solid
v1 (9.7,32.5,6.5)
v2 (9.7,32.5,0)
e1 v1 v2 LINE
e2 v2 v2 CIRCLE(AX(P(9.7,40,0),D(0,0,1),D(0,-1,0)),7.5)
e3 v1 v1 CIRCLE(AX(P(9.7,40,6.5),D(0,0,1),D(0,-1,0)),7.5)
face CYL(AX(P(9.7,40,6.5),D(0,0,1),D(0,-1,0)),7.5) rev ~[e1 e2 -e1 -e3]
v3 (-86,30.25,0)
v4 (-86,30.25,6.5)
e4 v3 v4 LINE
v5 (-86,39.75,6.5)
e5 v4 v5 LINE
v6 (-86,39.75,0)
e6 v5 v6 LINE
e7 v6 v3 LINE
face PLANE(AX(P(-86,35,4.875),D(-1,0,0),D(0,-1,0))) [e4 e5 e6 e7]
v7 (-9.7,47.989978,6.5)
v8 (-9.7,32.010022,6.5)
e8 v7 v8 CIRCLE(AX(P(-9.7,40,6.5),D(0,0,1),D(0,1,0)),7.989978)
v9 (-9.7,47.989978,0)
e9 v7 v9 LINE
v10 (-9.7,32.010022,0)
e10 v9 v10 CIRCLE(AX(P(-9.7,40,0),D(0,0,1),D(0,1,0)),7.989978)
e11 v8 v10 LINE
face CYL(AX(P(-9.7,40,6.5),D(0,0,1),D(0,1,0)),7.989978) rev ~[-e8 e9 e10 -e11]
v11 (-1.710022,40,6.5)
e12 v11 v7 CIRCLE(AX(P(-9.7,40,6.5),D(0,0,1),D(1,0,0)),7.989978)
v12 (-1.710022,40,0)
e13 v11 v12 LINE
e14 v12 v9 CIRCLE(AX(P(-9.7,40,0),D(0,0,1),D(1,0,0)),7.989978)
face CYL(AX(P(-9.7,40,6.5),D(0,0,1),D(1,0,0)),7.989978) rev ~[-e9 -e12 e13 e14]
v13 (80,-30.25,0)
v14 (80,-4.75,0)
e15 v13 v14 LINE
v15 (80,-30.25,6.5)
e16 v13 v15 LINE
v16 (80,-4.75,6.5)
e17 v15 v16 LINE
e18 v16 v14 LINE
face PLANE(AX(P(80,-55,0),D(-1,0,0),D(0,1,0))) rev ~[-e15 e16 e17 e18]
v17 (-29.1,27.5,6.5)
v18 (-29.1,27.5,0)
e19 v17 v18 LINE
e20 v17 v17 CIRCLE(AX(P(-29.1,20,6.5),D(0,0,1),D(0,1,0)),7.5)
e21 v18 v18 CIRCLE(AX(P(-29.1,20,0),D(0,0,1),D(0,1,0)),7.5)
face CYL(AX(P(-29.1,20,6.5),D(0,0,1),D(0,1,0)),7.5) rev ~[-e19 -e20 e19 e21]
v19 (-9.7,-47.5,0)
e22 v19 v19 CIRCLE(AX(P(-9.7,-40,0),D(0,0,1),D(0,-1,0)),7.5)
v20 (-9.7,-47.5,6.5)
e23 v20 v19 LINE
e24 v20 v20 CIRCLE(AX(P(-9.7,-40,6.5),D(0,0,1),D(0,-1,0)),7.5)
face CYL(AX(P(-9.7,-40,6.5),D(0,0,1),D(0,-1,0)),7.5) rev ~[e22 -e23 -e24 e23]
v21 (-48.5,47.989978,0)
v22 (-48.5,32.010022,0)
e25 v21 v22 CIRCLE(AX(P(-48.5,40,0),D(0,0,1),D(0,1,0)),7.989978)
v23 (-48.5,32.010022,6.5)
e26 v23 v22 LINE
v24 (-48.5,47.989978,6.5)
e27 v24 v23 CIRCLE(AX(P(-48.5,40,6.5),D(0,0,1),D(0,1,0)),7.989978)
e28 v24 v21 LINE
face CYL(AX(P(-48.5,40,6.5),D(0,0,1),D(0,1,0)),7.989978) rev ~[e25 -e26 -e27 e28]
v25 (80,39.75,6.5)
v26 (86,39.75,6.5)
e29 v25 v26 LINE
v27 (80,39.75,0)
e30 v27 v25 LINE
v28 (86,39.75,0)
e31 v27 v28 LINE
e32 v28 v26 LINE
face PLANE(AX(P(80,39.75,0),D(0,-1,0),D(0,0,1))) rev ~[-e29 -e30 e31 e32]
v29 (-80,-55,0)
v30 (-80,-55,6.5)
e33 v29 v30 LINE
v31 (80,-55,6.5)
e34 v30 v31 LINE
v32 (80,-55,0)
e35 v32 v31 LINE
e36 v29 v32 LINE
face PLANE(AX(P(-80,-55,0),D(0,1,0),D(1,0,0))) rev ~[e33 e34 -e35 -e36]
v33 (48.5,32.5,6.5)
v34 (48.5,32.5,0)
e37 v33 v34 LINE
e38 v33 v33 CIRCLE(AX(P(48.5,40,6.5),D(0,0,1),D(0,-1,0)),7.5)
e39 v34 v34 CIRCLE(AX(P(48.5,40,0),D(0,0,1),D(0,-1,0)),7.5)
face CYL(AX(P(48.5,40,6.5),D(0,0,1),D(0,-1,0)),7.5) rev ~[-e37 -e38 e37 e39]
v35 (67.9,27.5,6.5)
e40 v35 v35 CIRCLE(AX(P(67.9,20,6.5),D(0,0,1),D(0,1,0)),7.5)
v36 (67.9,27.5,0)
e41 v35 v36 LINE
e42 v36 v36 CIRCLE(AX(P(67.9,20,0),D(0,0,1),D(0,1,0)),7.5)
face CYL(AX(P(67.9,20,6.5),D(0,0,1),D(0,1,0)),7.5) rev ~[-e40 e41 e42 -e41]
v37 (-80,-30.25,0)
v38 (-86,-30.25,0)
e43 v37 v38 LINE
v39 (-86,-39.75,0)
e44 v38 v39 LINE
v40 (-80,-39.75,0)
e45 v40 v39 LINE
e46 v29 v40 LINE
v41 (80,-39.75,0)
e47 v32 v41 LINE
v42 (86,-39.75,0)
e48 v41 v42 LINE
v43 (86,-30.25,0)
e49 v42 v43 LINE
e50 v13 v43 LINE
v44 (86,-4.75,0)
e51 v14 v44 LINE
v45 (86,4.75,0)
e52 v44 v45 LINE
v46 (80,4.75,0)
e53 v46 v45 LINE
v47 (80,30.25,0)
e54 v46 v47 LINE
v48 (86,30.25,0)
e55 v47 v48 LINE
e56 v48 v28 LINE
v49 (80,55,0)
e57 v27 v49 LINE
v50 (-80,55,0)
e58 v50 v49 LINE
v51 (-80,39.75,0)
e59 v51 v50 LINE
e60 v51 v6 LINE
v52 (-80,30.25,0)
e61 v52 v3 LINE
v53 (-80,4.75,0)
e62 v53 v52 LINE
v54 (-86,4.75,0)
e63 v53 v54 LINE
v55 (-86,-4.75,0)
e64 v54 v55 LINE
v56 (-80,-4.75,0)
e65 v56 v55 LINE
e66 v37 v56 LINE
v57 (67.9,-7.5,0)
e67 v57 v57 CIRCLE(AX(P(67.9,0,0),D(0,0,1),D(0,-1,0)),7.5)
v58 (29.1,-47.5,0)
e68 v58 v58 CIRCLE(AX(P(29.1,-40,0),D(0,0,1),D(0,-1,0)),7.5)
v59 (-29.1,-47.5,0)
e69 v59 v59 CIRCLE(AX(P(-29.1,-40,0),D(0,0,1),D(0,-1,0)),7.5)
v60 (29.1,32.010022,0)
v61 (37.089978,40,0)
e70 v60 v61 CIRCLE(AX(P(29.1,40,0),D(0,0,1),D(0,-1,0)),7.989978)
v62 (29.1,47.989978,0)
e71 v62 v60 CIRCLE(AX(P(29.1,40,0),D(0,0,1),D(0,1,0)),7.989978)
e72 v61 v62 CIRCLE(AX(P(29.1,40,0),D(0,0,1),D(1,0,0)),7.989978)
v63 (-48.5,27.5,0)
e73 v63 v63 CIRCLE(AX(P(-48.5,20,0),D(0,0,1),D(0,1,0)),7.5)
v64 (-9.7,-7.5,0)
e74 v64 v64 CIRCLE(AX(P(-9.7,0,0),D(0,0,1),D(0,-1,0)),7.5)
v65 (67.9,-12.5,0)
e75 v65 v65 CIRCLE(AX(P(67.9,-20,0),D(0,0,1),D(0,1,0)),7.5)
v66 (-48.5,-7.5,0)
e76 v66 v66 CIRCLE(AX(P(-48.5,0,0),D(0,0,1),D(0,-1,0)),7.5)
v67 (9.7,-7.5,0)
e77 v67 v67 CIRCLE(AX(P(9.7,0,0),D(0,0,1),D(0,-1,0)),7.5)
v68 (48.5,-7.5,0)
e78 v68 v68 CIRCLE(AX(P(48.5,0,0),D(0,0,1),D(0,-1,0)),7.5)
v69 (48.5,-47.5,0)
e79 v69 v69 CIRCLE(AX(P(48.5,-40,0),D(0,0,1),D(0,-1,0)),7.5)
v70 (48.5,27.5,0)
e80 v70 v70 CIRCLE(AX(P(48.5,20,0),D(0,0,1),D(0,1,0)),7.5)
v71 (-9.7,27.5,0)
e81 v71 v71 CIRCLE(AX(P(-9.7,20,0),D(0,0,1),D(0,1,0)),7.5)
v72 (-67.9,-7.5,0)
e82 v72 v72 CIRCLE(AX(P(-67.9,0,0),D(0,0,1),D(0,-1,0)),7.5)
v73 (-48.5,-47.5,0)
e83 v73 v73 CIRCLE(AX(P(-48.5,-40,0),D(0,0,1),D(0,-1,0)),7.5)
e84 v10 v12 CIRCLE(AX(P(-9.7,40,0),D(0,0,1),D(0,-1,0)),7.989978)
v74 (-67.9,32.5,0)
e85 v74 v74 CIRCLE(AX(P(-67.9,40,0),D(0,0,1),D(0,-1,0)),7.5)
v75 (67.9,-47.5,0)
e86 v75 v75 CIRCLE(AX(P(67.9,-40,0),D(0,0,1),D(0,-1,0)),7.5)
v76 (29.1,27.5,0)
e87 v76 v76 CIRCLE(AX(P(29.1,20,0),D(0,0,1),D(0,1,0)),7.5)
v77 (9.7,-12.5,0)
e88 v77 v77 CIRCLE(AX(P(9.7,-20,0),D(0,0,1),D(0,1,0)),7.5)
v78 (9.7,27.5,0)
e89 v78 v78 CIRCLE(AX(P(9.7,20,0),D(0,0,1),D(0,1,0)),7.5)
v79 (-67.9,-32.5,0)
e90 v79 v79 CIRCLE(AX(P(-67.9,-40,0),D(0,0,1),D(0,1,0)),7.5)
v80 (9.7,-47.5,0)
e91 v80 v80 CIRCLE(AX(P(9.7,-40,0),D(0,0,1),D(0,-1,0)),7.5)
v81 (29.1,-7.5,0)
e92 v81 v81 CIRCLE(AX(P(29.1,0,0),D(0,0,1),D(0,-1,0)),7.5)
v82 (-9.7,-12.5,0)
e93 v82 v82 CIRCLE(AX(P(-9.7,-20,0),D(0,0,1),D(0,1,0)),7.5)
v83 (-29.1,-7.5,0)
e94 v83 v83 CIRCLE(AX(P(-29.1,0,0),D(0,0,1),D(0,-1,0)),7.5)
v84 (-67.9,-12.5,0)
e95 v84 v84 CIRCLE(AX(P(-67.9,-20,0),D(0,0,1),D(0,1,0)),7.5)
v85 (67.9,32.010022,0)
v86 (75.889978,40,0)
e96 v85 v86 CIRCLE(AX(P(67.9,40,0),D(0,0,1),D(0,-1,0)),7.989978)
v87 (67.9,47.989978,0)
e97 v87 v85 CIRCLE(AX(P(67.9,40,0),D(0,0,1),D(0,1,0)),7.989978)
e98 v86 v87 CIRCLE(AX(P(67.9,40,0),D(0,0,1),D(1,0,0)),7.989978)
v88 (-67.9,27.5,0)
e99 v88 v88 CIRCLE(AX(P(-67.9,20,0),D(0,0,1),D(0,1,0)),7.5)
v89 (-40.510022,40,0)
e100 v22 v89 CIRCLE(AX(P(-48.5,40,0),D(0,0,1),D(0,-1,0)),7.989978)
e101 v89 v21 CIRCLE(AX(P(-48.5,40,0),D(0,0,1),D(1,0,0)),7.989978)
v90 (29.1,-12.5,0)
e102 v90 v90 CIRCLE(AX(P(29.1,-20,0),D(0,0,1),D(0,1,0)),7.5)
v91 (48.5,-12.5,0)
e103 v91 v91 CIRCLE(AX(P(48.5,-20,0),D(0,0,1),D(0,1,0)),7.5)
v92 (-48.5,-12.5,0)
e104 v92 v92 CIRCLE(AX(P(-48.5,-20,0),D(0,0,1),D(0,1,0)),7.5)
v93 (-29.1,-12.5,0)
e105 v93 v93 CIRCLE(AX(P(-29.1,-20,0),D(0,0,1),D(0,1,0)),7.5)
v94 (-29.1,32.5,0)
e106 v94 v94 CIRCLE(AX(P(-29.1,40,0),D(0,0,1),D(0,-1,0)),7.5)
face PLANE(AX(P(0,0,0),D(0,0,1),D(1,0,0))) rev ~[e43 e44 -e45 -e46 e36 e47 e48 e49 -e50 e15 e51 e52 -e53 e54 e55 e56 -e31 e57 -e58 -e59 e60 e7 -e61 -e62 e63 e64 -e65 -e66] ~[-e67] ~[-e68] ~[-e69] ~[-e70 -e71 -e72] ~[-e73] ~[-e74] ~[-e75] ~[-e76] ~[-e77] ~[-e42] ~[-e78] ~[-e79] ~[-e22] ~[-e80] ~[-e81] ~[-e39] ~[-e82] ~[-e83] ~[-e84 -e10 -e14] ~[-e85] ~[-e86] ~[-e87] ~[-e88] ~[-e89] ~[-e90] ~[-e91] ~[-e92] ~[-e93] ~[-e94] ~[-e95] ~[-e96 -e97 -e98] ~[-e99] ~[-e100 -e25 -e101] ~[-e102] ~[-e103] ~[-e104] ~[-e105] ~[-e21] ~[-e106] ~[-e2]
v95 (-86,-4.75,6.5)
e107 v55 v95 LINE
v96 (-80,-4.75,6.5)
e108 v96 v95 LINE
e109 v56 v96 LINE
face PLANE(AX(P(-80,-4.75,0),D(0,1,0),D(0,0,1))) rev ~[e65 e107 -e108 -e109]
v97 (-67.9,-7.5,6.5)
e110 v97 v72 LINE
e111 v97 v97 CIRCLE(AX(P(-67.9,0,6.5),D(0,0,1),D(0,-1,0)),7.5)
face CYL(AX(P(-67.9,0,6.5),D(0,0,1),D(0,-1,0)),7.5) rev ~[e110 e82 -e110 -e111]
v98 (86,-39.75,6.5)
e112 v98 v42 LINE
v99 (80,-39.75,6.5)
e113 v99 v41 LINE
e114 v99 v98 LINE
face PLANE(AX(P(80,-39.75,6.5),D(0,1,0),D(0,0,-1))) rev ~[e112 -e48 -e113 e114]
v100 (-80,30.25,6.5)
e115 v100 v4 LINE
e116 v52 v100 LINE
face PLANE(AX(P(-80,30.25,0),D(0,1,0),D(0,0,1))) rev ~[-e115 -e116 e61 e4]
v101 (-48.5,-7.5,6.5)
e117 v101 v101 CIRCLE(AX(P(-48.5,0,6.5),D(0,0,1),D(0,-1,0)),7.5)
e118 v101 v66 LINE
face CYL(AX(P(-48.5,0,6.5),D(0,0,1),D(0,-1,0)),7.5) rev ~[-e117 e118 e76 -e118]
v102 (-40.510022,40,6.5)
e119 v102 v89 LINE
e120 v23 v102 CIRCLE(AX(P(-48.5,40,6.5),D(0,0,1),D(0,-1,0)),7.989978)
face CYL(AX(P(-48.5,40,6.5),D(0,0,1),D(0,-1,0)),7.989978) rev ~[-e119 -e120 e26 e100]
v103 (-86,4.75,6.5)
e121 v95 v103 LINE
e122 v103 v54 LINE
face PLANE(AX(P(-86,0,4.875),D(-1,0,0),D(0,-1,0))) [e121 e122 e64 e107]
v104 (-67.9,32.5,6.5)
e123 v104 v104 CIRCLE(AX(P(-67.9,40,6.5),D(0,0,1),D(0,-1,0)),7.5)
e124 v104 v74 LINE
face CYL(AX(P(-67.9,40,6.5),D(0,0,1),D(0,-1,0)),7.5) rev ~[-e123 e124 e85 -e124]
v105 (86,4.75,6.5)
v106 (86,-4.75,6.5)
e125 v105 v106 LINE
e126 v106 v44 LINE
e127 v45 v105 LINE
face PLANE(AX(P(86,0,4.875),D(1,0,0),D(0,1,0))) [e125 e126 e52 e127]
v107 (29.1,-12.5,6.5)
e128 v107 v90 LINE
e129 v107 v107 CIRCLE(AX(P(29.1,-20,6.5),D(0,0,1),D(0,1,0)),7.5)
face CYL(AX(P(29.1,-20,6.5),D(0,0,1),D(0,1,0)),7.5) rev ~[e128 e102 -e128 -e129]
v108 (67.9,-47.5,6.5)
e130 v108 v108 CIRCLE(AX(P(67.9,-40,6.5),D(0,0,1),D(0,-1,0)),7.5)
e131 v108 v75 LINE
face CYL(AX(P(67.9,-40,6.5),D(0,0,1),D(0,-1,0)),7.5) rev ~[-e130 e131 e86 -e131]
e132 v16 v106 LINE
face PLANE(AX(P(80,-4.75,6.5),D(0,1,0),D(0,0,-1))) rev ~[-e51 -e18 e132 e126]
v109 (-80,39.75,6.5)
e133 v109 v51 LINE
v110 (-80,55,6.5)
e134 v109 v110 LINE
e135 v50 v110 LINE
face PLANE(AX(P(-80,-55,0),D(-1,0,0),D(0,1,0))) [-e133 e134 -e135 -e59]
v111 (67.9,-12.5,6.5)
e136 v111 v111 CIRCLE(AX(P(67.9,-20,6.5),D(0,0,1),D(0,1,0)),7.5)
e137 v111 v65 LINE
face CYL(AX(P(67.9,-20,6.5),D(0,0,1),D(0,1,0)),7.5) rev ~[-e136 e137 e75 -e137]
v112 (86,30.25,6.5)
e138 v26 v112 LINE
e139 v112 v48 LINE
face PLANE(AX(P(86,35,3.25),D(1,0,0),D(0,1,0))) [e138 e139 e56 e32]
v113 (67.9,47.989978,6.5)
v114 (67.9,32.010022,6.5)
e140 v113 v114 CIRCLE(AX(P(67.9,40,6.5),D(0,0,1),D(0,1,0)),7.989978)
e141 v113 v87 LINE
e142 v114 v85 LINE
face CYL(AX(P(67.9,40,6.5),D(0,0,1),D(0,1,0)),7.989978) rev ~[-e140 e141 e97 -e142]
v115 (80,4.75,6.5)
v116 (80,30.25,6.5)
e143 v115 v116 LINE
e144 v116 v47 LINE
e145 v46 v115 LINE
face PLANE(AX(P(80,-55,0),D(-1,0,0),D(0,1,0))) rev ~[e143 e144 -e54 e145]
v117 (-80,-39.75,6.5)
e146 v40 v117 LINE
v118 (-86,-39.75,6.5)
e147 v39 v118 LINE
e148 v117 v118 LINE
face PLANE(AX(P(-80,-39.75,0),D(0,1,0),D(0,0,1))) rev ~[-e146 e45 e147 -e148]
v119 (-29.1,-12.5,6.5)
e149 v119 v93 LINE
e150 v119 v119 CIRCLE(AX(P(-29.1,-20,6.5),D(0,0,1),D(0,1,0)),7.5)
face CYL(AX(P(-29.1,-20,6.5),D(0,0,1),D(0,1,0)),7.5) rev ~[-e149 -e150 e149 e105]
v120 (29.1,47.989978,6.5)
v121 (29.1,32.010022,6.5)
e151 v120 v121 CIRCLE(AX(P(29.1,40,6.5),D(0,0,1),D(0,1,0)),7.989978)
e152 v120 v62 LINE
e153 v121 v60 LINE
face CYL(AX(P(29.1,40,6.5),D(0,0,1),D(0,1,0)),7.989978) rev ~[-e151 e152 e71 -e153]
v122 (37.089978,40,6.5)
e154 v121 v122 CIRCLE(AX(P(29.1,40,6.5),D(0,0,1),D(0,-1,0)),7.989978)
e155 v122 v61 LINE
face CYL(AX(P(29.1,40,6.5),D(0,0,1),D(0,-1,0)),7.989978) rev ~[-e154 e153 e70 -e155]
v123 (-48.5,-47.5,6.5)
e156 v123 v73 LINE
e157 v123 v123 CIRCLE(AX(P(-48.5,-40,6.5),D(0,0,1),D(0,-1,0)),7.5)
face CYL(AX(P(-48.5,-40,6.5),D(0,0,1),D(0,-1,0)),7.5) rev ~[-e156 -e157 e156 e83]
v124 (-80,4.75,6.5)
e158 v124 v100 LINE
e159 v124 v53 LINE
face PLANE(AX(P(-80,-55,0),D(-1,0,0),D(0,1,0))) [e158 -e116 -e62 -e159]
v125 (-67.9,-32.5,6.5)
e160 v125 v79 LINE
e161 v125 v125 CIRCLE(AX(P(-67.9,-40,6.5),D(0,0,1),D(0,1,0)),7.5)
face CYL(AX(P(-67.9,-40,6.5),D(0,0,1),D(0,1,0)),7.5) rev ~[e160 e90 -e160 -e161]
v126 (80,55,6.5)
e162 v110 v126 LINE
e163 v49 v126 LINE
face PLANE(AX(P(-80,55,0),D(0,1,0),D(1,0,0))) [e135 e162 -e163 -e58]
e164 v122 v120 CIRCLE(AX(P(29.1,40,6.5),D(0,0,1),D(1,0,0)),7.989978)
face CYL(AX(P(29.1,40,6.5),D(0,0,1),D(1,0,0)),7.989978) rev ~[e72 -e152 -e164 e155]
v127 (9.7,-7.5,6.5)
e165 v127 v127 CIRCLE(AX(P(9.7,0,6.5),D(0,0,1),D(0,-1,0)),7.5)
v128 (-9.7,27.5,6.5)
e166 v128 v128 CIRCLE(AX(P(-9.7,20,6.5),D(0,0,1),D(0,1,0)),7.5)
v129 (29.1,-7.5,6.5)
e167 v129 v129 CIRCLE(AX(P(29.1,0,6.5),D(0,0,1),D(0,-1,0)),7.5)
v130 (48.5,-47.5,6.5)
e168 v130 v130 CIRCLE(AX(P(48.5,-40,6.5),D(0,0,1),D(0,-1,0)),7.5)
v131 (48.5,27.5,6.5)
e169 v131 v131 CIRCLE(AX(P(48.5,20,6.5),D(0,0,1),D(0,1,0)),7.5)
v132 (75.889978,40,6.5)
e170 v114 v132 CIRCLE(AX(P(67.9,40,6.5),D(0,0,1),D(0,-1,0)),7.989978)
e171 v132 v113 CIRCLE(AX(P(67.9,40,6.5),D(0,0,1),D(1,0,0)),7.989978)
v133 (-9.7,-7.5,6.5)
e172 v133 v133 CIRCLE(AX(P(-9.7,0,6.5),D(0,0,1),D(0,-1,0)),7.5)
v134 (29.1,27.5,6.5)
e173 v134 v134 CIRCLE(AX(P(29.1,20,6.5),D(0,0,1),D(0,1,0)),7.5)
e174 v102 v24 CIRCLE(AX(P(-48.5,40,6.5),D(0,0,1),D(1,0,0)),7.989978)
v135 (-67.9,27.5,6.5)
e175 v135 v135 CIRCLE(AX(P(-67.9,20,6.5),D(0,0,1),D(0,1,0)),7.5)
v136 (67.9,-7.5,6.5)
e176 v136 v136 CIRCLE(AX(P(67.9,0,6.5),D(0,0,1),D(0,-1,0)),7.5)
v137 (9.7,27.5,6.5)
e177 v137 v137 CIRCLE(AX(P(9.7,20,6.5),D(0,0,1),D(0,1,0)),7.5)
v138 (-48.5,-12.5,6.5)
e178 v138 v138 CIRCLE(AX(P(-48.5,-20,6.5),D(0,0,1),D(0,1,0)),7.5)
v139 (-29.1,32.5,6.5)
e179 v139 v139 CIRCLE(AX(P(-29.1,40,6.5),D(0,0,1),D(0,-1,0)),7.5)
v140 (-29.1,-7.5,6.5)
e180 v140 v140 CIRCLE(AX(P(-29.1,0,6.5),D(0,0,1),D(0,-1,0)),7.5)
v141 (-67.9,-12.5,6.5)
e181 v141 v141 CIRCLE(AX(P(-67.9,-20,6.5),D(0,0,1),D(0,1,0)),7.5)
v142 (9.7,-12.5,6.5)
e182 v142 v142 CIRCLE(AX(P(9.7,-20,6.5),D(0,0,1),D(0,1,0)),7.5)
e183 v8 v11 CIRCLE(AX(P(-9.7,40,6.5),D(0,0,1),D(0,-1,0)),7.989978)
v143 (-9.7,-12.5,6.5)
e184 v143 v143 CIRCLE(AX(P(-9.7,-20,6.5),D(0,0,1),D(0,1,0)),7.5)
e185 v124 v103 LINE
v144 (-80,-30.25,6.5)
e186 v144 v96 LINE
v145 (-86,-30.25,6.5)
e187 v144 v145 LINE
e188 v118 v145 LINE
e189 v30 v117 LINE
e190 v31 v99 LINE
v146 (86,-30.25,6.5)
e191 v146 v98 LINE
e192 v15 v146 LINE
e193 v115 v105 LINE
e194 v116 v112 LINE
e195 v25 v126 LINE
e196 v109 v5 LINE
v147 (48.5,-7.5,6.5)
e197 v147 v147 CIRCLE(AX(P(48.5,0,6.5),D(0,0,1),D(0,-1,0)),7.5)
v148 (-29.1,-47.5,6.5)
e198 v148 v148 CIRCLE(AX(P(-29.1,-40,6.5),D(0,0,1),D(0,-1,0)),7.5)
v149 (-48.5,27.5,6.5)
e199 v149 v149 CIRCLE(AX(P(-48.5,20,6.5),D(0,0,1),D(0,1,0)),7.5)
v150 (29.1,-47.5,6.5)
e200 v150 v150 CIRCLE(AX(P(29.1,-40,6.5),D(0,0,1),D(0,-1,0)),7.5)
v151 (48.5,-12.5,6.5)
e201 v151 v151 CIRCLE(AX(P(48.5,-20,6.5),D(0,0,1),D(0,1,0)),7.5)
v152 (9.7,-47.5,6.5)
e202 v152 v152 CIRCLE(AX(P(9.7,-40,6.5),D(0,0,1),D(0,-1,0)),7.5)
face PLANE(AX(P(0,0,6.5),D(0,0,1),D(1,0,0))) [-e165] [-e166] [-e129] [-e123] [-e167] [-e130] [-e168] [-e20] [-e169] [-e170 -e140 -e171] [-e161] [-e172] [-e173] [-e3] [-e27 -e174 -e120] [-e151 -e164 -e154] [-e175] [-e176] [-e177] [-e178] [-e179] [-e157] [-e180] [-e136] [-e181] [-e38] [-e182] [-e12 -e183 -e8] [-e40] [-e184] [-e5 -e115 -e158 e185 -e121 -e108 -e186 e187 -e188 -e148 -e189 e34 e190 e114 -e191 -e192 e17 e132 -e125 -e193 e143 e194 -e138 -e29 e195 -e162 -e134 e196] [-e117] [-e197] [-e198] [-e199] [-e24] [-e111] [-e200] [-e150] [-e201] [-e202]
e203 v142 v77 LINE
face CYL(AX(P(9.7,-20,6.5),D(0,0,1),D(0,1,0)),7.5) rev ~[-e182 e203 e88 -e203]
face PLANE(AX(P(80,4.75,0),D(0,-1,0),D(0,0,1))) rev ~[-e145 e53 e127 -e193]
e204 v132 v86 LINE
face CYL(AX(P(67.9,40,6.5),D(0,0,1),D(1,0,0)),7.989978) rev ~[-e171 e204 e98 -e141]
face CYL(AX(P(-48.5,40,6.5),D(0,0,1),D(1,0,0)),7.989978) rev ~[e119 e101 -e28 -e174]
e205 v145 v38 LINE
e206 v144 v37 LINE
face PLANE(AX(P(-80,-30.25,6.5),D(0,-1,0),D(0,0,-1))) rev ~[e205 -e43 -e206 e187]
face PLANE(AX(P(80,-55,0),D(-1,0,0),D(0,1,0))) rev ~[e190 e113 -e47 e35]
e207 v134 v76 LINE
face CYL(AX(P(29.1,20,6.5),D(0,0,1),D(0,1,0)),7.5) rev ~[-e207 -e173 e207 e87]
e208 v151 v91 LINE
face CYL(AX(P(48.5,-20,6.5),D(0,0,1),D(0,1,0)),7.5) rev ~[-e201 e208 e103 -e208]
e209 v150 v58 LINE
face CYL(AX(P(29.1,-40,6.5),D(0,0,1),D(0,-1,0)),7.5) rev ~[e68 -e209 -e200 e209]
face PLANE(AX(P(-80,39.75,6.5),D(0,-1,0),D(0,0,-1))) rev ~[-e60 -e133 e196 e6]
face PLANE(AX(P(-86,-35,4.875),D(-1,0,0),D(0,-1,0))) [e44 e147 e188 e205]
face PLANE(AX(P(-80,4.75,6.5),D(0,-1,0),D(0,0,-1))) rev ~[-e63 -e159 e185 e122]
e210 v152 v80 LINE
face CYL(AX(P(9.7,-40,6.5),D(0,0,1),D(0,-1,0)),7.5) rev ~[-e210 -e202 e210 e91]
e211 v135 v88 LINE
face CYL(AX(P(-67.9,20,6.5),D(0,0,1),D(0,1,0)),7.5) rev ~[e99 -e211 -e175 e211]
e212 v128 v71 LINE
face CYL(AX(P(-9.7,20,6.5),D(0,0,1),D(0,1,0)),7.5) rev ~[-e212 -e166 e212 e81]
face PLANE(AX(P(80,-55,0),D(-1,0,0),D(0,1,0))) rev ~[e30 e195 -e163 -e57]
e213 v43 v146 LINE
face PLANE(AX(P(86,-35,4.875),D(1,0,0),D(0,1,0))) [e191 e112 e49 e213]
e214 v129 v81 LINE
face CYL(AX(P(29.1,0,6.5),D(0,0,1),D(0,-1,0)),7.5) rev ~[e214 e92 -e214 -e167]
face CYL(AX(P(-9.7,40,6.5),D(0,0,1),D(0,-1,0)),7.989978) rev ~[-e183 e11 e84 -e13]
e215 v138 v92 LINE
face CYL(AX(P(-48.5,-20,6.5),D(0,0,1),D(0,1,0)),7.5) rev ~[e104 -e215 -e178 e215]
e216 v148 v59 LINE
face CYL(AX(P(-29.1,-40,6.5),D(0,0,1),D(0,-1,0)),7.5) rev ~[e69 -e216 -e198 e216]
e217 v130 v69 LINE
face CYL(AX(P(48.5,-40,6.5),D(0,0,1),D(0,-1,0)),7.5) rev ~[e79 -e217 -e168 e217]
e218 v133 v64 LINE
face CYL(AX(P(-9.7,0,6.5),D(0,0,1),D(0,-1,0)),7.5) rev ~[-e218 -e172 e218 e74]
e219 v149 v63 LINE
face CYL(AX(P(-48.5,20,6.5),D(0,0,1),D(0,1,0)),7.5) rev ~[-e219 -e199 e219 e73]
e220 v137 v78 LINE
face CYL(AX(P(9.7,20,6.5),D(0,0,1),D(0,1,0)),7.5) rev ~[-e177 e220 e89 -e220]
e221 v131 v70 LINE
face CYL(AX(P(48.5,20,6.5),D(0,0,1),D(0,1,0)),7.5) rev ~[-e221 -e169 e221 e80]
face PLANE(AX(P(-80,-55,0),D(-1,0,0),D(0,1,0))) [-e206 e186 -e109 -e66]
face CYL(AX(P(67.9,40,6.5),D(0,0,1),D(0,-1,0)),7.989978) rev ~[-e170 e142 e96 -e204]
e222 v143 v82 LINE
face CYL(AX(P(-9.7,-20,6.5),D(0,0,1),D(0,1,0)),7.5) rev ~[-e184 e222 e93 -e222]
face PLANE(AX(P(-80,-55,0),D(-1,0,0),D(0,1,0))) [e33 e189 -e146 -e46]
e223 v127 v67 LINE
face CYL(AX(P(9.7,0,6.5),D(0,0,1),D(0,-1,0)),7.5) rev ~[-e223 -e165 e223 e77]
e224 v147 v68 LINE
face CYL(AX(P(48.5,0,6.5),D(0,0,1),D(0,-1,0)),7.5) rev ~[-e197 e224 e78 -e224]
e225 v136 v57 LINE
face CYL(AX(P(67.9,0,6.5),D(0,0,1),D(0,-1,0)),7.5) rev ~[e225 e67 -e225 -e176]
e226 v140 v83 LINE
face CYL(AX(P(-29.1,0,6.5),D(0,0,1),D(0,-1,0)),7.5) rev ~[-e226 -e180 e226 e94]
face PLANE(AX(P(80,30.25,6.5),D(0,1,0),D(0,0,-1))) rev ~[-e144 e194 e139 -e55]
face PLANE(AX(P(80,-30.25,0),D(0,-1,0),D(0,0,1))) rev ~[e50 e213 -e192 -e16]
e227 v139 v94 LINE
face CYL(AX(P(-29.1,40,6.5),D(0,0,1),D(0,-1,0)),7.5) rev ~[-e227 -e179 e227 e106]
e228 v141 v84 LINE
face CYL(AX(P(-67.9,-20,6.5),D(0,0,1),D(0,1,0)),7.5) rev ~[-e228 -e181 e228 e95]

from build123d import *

# Parameters (mm, degrees)
F0_W     = 160
F0_H     = 110
F1_DEPTH = 6.5
F3_DEPTH = 6
F5_DEPTH = 6
F7_DEPTH = 25


# Not quite as in the source:
# - a feature names something its author has since deleted; it is built from what else it names


with BuildPart() as f1:
    # F0 (on Top) → F1 (new body)
    with BuildSketch(Plane.XY):
        Rectangle(F0_W, F0_H)
    extrude(amount=F1_DEPTH)

    # F2 (on face) → F3 (join)
    with BuildSketch(Plane(origin=(-80, 0, 0), x_dir=(0, -1, 0), z_dir=(-1, 0, 0))):
        Polygon((-39.75, 6.5), (-39.75, 3.25), (-35, 3.25), (-30.25, 3.25), (-30.25, 6.5), align=None)
        Polygon((-35, 3.25), (-39.75, 3.25), (-39.75, 0), (-30.25, 0), (-30.25, 3.25), align=None)
        Polygon((-4.75, 6.5), (-4.75, 3.25), (0, 3.25), (4.75, 3.25), (4.75, 6.5), align=None)
        Polygon((0, 3.25), (-4.75, 3.25), (-4.75, 0), (4.75, 0), (4.75, 3.25), align=None)
        Polygon((39.75, 6.5), (30.25, 6.5), (30.25, 3.25), (35, 3.25), (39.75, 3.25), align=None)
        Polygon((30.25, 3.25), (30.25, 0), (39.75, 0), (39.75, 3.25), (35, 3.25), align=None)
    extrude(amount=F3_DEPTH)

    # F4 (on face) → F5 (join)
    with BuildSketch(Plane.YZ.offset(80)):
        Polygon((-39.75, 6.5), (-39.75, 3.25), (-35, 3.25), (-30.25, 3.25), (-30.25, 6.5), align=None)
        Polygon((-35, 3.25), (-39.75, 3.25), (-39.75, 0), (-30.25, 0), (-30.25, 3.25), align=None)
        Polygon((-4.75, 6.5), (-4.75, 3.25), (0, 3.25), (4.75, 3.25), (4.75, 6.5), align=None)
        Polygon((0, 3.25), (-4.75, 3.25), (-4.75, 0), (4.75, 0), (4.75, 3.25), align=None)
        Polygon((39.75, 6.5), (30.25, 6.5), (30.25, 3.25), (30.25, 0), (39.75, 0), align=None)
    extrude(amount=F5_DEPTH)

    # F6 (on face) → F7 (cut)
    with BuildSketch(Plane.XY.offset(6.5)):
        with BuildLine():
            Line((-67.9, 40), (-67.9, 47.5))
            ThreePointArc((-67.9, 47.5), (-75.4, 40), (-67.9, 32.5))
            Line((-67.9, 32.5), (-67.9, 40))
        make_face()
        with BuildLine():
            ThreePointArc((-60.4, 40), (-62.5966991411, 45.3033008589), (-67.9, 47.5))
            Line((-67.9, 47.5), (-67.9, 40))
            Line((-67.9, 40), (-67.9, 32.5))
            ThreePointArc((-67.9, 32.5), (-62.5966991411, 34.6966991411), (-60.4, 40))
        make_face()
        with BuildLine():
            Line((-48.5, 32.0100222161), (-48.5, 47.9899777839))
            ThreePointArc((-48.5, 47.9899777839), (-56.4899777839, 40), (-48.5, 32.0100222161))
        make_face()
        with BuildLine():
            ThreePointArc((-40.5100222161, 40), (-42.8502325275, 45.6497674725), (-48.5, 47.9899777839))
            Line((-48.5, 47.9899777839), (-48.5, 32.0100222161))
            ThreePointArc((-48.5, 32.0100222161), (-42.8502325275, 34.3502325275), (-40.5100222161, 40))
        make_face()
        with BuildLine():
            Line((-29.1, 32.5), (-29.1, 47.5))
            ThreePointArc((-29.1, 47.5), (-36.6, 40), (-29.1, 32.5))
        make_face()
        with BuildLine():
            ThreePointArc((-21.6, 40), (-23.7966991411, 45.3033008589), (-29.1, 47.5))
            Line((-29.1, 47.5), (-29.1, 32.5))
            ThreePointArc((-29.1, 32.5), (-23.7966991411, 34.6966991411), (-21.6, 40))
        make_face()
        with BuildLine():
            Line((-9.7, 32.0100222161), (-9.7, 47.9899777839))
            ThreePointArc((-9.7, 47.9899777839), (-17.6899777839, 40), (-9.7, 32.0100222161))
        make_face()
        with BuildLine():
            ThreePointArc((-1.7100222161, 40), (-4.0502325275, 45.6497674725), (-9.7, 47.9899777839))
            Line((-9.7, 47.9899777839), (-9.7, 32.0100222161))
            ThreePointArc((-9.7, 32.0100222161), (-4.0502325275, 34.3502325275), (-1.7100222161, 40))
        make_face()
        with BuildLine():
            Line((9.7, 32.5), (9.7, 47.5))
            ThreePointArc((9.7, 47.5), (2.2, 40), (9.7, 32.5))
        make_face()
        with BuildLine():
            ThreePointArc((17.2, 40), (15.0033008589, 45.3033008589), (9.7, 47.5))
            Line((9.7, 47.5), (9.7, 32.5))
            ThreePointArc((9.7, 32.5), (15.0033008589, 34.6966991411), (17.2, 40))
        make_face()
        with BuildLine():
            Line((29.1, 32.0100222161), (29.1, 47.9899777839))
            ThreePointArc((29.1, 47.9899777839), (21.1100222161, 40), (29.1, 32.0100222161))
        make_face()
        with BuildLine():
            ThreePointArc((37.0899777839, 40), (34.7497674725, 45.6497674725), (29.1, 47.9899777839))
            Line((29.1, 47.9899777839), (29.1, 32.0100222161))
            ThreePointArc((29.1, 32.0100222161), (34.7497674725, 34.3502325275), (37.0899777839, 40))
        make_face()
        with BuildLine():
            Line((48.5, 32.5), (48.5, 47.5))
            ThreePointArc((48.5, 47.5), (41, 40), (48.5, 32.5))
        make_face()
        with BuildLine():
            ThreePointArc((56, 40), (53.8033008589, 45.3033008589), (48.5, 47.5))
            Line((48.5, 47.5), (48.5, 32.5))
            ThreePointArc((48.5, 32.5), (53.8033008589, 34.6966991411), (56, 40))
        make_face()
        with BuildLine():
            Line((67.9, 32.0100222161), (67.9, 47.9899777839))
            ThreePointArc((67.9, 47.9899777839), (59.9100222161, 40), (67.9, 32.0100222161))
        make_face()
        with BuildLine():
            ThreePointArc((75.8899777839, 40), (73.5497674725, 45.6497674725), (67.9, 47.9899777839))
            Line((67.9, 47.9899777839), (67.9, 32.0100222161))
            ThreePointArc((67.9, 32.0100222161), (73.5497674725, 34.3502325275), (75.8899777839, 40))
        make_face()
        with BuildLine():
            ThreePointArc((75.4, 20), (73.2033008589, 25.3033008589), (67.9, 27.5))
            Line((67.9, 27.5), (67.9, 12.5))
            ThreePointArc((67.9, 12.5), (73.2033008589, 14.6966991411), (75.4, 20))
        make_face()
        with BuildLine():
            Line((67.9, 12.5), (67.9, 27.5))
            ThreePointArc((67.9, 27.5), (60.4, 20), (67.9, 12.5))
        make_face()
        with BuildLine():
            ThreePointArc((56, 20), (53.8033008589, 25.3033008589), (48.5, 27.5))
            Line((48.5, 27.5), (48.5, 12.5))
            ThreePointArc((48.5, 12.5), (53.8033008589, 14.6966991411), (56, 20))
        make_face()
        with BuildLine():
            Line((48.5, 12.5), (48.5, 27.5))
            ThreePointArc((48.5, 27.5), (41, 20), (48.5, 12.5))
        make_face()
        with BuildLine():
            ThreePointArc((36.6, 20), (34.4033008589, 25.3033008589), (29.1, 27.5))
            Line((29.1, 27.5), (29.1, 12.5))
            ThreePointArc((29.1, 12.5), (34.4033008589, 14.6966991411), (36.6, 20))
        make_face()
        with BuildLine():
            Line((29.1, 12.5), (29.1, 27.5))
            ThreePointArc((29.1, 27.5), (21.6, 20), (29.1, 12.5))
        make_face()
        with BuildLine():
            ThreePointArc((17.2, 20), (15.0033008589, 25.3033008589), (9.7, 27.5))
            Line((9.7, 27.5), (9.7, 12.5))
            ThreePointArc((9.7, 12.5), (15.0033008589, 14.6966991411), (17.2, 20))
        make_face()
        with BuildLine():
            Line((9.7, 12.5), (9.7, 27.5))
            ThreePointArc((9.7, 27.5), (2.2, 20), (9.7, 12.5))
        make_face()
        with BuildLine():
            ThreePointArc((-2.2, 20), (-4.3966991411, 25.3033008589), (-9.7, 27.5))
            Line((-9.7, 27.5), (-9.7, 12.5))
            ThreePointArc((-9.7, 12.5), (-4.3966991411, 14.6966991411), (-2.2, 20))
        make_face()
        with BuildLine():
            Line((-9.7, 12.5), (-9.7, 27.5))
            ThreePointArc((-9.7, 27.5), (-17.2, 20), (-9.7, 12.5))
        make_face()
        with BuildLine():
            ThreePointArc((-21.6, 20), (-23.7966991411, 25.3033008589), (-29.1, 27.5))
            Line((-29.1, 27.5), (-29.1, 12.5))
            ThreePointArc((-29.1, 12.5), (-23.7966991411, 14.6966991411), (-21.6, 20))
        make_face()
        with BuildLine():
            Line((-29.1, 12.5), (-29.1, 27.5))
            ThreePointArc((-29.1, 27.5), (-36.6, 20), (-29.1, 12.5))
        make_face()
        with BuildLine():
            ThreePointArc((-41, 20), (-43.1966991411, 25.3033008589), (-48.5, 27.5))
            Line((-48.5, 27.5), (-48.5, 12.5))
            ThreePointArc((-48.5, 12.5), (-43.1966991411, 14.6966991411), (-41, 20))
        make_face()
        with BuildLine():
            Line((-48.5, 12.5), (-48.5, 27.5))
            ThreePointArc((-48.5, 27.5), (-56, 20), (-48.5, 12.5))
        make_face()
        with BuildLine():
            ThreePointArc((-60.4, 20), (-62.5966991411, 25.3033008589), (-67.9, 27.5))
            Line((-67.9, 27.5), (-67.9, 20))
            Line((-67.9, 20), (-67.9, 12.5))
            ThreePointArc((-67.9, 12.5), (-62.5966991411, 14.6966991411), (-60.4, 20))
        make_face()
        with BuildLine():
            Line((-67.9, 20), (-67.9, 27.5))
            ThreePointArc((-67.9, 27.5), (-75.4, 20), (-67.9, 12.5))
            Line((-67.9, 12.5), (-67.9, 20))
        make_face()
        with BuildLine():
            Line((-67.9, 0), (-67.9, 7.5))
            ThreePointArc((-67.9, 7.5), (-75.4, 0), (-67.9, -7.5))
            Line((-67.9, -7.5), (-67.9, 0))
        make_face()
        with BuildLine():
            ThreePointArc((-60.4, 0), (-62.5966991411, 5.3033008589), (-67.9, 7.5))
            Line((-67.9, 7.5), (-67.9, 0))
            Line((-67.9, 0), (-67.9, -7.5))
            ThreePointArc((-67.9, -7.5), (-62.5966991411, -5.3033008589), (-60.4, 0))
        make_face()
        with BuildLine():
            Line((-48.5, -7.5), (-48.5, 7.5))
            ThreePointArc((-48.5, 7.5), (-56, 0), (-48.5, -7.5))
        make_face()
        with BuildLine():
            ThreePointArc((-41, 0), (-43.1966991411, 5.3033008589), (-48.5, 7.5))
            Line((-48.5, 7.5), (-48.5, -7.5))
            ThreePointArc((-48.5, -7.5), (-43.1966991411, -5.3033008589), (-41, 0))
        make_face()
        with BuildLine():
            Line((-29.1, -7.5), (-29.1, 7.5))
            ThreePointArc((-29.1, 7.5), (-36.6, 0), (-29.1, -7.5))
        make_face()
        with BuildLine():
            ThreePointArc((-21.6, 0), (-23.7966991411, 5.3033008589), (-29.1, 7.5))
            Line((-29.1, 7.5), (-29.1, -7.5))
            ThreePointArc((-29.1, -7.5), (-23.7966991411, -5.3033008589), (-21.6, 0))
        make_face()
        with BuildLine():
            Line((-9.7, -7.5), (-9.7, 7.5))
            ThreePointArc((-9.7, 7.5), (-17.2, 0), (-9.7, -7.5))
        make_face()
        with BuildLine():
            ThreePointArc((-2.2, 0), (-4.3966991411, 5.3033008589), (-9.7, 7.5))
            Line((-9.7, 7.5), (-9.7, -7.5))
            ThreePointArc((-9.7, -7.5), (-4.3966991411, -5.3033008589), (-2.2, 0))
        make_face()
        with BuildLine():
            Line((9.7, -7.5), (9.7, 7.5))
            ThreePointArc((9.7, 7.5), (2.2, 0), (9.7, -7.5))
        make_face()
        with BuildLine():
            ThreePointArc((17.2, 0), (15.0033008589, 5.3033008589), (9.7, 7.5))
            Line((9.7, 7.5), (9.7, -7.5))
            ThreePointArc((9.7, -7.5), (15.0033008589, -5.3033008589), (17.2, 0))
        make_face()
        with BuildLine():
            Line((29.1, -7.5), (29.1, 7.5))
            ThreePointArc((29.1, 7.5), (21.6, 0), (29.1, -7.5))
        make_face()
        with BuildLine():
            ThreePointArc((36.6, 0), (34.4033008589, 5.3033008589), (29.1, 7.5))
            Line((29.1, 7.5), (29.1, -7.5))
            ThreePointArc((29.1, -7.5), (34.4033008589, -5.3033008589), (36.6, 0))
        make_face()
        with BuildLine():
            Line((48.5, -7.5), (48.5, 7.5))
            ThreePointArc((48.5, 7.5), (41, 0), (48.5, -7.5))
        make_face()
        with BuildLine():
            ThreePointArc((56, 0), (53.8033008589, 5.3033008589), (48.5, 7.5))
            Line((48.5, 7.5), (48.5, -7.5))
            ThreePointArc((48.5, -7.5), (53.8033008589, -5.3033008589), (56, 0))
        make_face()
        with BuildLine():
            Line((67.9, -7.5), (67.9, 7.5))
            ThreePointArc((67.9, 7.5), (60.4, 0), (67.9, -7.5))
        make_face()
        with BuildLine():
            ThreePointArc((75.4, 0), (73.2033008589, 5.3033008589), (67.9, 7.5))
            Line((67.9, 7.5), (67.9, -7.5))
            ThreePointArc((67.9, -7.5), (73.2033008589, -5.3033008589), (75.4, 0))
        make_face()
        with BuildLine():
            ThreePointArc((75.4, -20), (73.2033008589, -14.6966991411), (67.9, -12.5))
            Line((67.9, -12.5), (67.9, -27.5))
            ThreePointArc((67.9, -27.5), (73.2033008589, -25.3033008589), (75.4, -20))
        make_face()
        with BuildLine():
            Line((67.9, -27.5), (67.9, -12.5))
            ThreePointArc((67.9, -12.5), (60.4, -20), (67.9, -27.5))
        make_face()
        with BuildLine():
            ThreePointArc((56, -20), (53.8033008589, -14.6966991411), (48.5, -12.5))
            Line((48.5, -12.5), (48.5, -27.5))
            ThreePointArc((48.5, -27.5), (53.8033008589, -25.3033008589), (56, -20))
        make_face()
        with BuildLine():
            Line((48.5, -27.5), (48.5, -12.5))
            ThreePointArc((48.5, -12.5), (41, -20), (48.5, -27.5))
        make_face()
        with BuildLine():
            ThreePointArc((36.6, -20), (34.4033008589, -14.6966991411), (29.1, -12.5))
            Line((29.1, -12.5), (29.1, -27.5))
            ThreePointArc((29.1, -27.5), (34.4033008589, -25.3033008589), (36.6, -20))
        make_face()
        with BuildLine():
            Line((29.1, -27.5), (29.1, -12.5))
            ThreePointArc((29.1, -12.5), (21.6, -20), (29.1, -27.5))
        make_face()
        with BuildLine():
            ThreePointArc((17.2, -20), (15.0033008589, -14.6966991411), (9.7, -12.5))
            Line((9.7, -12.5), (9.7, -27.5))
            ThreePointArc((9.7, -27.5), (15.0033008589, -25.3033008589), (17.2, -20))
        make_face()
        with BuildLine():
            Line((9.7, -27.5), (9.7, -12.5))
            ThreePointArc((9.7, -12.5), (2.2, -20), (9.7, -27.5))
        make_face()
        with BuildLine():
            ThreePointArc((-2.2, -20), (-4.3966991411, -14.6966991411), (-9.7, -12.5))
            Line((-9.7, -12.5), (-9.7, -27.5))
            ThreePointArc((-9.7, -27.5), (-4.3966991411, -25.3033008589), (-2.2, -20))
        make_face()
        with BuildLine():
            Line((-9.7, -27.5), (-9.7, -12.5))
            ThreePointArc((-9.7, -12.5), (-17.2, -20), (-9.7, -27.5))
        make_face()
        with BuildLine():
            ThreePointArc((-21.6, -20), (-23.7966991411, -14.6966991411), (-29.1, -12.5))
            Line((-29.1, -12.5), (-29.1, -27.5))
            ThreePointArc((-29.1, -27.5), (-23.7966991411, -25.3033008589), (-21.6, -20))
        make_face()
        with BuildLine():
            Line((-29.1, -27.5), (-29.1, -12.5))
            ThreePointArc((-29.1, -12.5), (-36.6, -20), (-29.1, -27.5))
        make_face()
        with BuildLine():
            ThreePointArc((-41, -20), (-43.1966991411, -14.6966991411), (-48.5, -12.5))
            Line((-48.5, -12.5), (-48.5, -27.5))
            ThreePointArc((-48.5, -27.5), (-43.1966991411, -25.3033008589), (-41, -20))
        make_face()
        with BuildLine():
            Line((-48.5, -27.5), (-48.5, -12.5))
            ThreePointArc((-48.5, -12.5), (-56, -20), (-48.5, -27.5))
        make_face()
        with BuildLine():
            ThreePointArc((-60.4, -20), (-62.5966991411, -14.6966991411), (-67.9, -12.5))
            Line((-67.9, -12.5), (-67.9, -20))
            Line((-67.9, -20), (-67.9, -27.5))
            ThreePointArc((-67.9, -27.5), (-62.5966991411, -25.3033008589), (-60.4, -20))
        make_face()
        with BuildLine():
            Line((-67.9, -20), (-67.9, -12.5))
            ThreePointArc((-67.9, -12.5), (-75.4, -20), (-67.9, -27.5))
            Line((-67.9, -27.5), (-67.9, -20))
        make_face()
        with BuildLine():
            ThreePointArc((-60.4, -40), (-62.5966991411, -34.6966991411), (-67.9, -32.5))
            ThreePointArc((-67.9, -32.5), (-73.2033008589, -45.3033008589), (-60.4, -40))
        make_face()
        with BuildLine():
            Line((-48.5, -47.5), (-48.5, -32.5))
            ThreePointArc((-48.5, -32.5), (-56, -40), (-48.5, -47.5))
        make_face()
        with BuildLine():
            ThreePointArc((-41, -40), (-43.1966991411, -34.6966991411), (-48.5, -32.5))
            Line((-48.5, -32.5), (-48.5, -47.5))
            ThreePointArc((-48.5, -47.5), (-43.1966991411, -45.3033008589), (-41, -40))
        make_face()
        with BuildLine():
            Line((-29.1, -47.5), (-29.1, -32.5))
            ThreePointArc((-29.1, -32.5), (-36.6, -40), (-29.1, -47.5))
        make_face()
        with BuildLine():
            ThreePointArc((-21.6, -40), (-23.7966991411, -34.6966991411), (-29.1, -32.5))
            Line((-29.1, -32.5), (-29.1, -47.5))
            ThreePointArc((-29.1, -47.5), (-23.7966991411, -45.3033008589), (-21.6, -40))
        make_face()
        with BuildLine():
            Line((-9.7, -47.5), (-9.7, -32.5))
            ThreePointArc((-9.7, -32.5), (-17.2, -40), (-9.7, -47.5))
        make_face()
        with BuildLine():
            ThreePointArc((-2.2, -40), (-4.3966991411, -34.6966991411), (-9.7, -32.5))
            Line((-9.7, -32.5), (-9.7, -47.5))
            ThreePointArc((-9.7, -47.5), (-4.3966991411, -45.3033008589), (-2.2, -40))
        make_face()
        with BuildLine():
            Line((9.7, -47.5), (9.7, -32.5))
            ThreePointArc((9.7, -32.5), (2.2, -40), (9.7, -47.5))
        make_face()
        with BuildLine():
            ThreePointArc((17.2, -40), (15.0033008589, -34.6966991411), (9.7, -32.5))
            Line((9.7, -32.5), (9.7, -47.5))
            ThreePointArc((9.7, -47.5), (15.0033008589, -45.3033008589), (17.2, -40))
        make_face()
        with BuildLine():
            Line((29.1, -47.5), (29.1, -32.5))
            ThreePointArc((29.1, -32.5), (21.6, -40), (29.1, -47.5))
        make_face()
        with BuildLine():
            ThreePointArc((36.6, -40), (34.4033008589, -34.6966991411), (29.1, -32.5))
            Line((29.1, -32.5), (29.1, -47.5))
            ThreePointArc((29.1, -47.5), (34.4033008589, -45.3033008589), (36.6, -40))
        make_face()
        with BuildLine():
            Line((48.5, -47.5), (48.5, -32.5))
            ThreePointArc((48.5, -32.5), (41, -40), (48.5, -47.5))
        make_face()
        with BuildLine():
            ThreePointArc((56, -40), (53.8033008589, -34.6966991411), (48.5, -32.5))
            Line((48.5, -32.5), (48.5, -47.5))
            ThreePointArc((48.5, -47.5), (53.8033008589, -45.3033008589), (56, -40))
        make_face()
        with BuildLine():
            Line((67.9, -47.5), (67.9, -32.5))
            ThreePointArc((67.9, -32.5), (60.4, -40), (67.9, -47.5))
        make_face()
        with BuildLine():
            ThreePointArc((75.4, -40), (73.2033008589, -34.6966991411), (67.9, -32.5))
            Line((67.9, -32.5), (67.9, -47.5))
            ThreePointArc((67.9, -47.5), (73.2033008589, -45.3033008589), (75.4, -40))
        make_face()
    extrude(amount=-F7_DEPTH, mode=Mode.SUBTRACT)


solid = f1.part
